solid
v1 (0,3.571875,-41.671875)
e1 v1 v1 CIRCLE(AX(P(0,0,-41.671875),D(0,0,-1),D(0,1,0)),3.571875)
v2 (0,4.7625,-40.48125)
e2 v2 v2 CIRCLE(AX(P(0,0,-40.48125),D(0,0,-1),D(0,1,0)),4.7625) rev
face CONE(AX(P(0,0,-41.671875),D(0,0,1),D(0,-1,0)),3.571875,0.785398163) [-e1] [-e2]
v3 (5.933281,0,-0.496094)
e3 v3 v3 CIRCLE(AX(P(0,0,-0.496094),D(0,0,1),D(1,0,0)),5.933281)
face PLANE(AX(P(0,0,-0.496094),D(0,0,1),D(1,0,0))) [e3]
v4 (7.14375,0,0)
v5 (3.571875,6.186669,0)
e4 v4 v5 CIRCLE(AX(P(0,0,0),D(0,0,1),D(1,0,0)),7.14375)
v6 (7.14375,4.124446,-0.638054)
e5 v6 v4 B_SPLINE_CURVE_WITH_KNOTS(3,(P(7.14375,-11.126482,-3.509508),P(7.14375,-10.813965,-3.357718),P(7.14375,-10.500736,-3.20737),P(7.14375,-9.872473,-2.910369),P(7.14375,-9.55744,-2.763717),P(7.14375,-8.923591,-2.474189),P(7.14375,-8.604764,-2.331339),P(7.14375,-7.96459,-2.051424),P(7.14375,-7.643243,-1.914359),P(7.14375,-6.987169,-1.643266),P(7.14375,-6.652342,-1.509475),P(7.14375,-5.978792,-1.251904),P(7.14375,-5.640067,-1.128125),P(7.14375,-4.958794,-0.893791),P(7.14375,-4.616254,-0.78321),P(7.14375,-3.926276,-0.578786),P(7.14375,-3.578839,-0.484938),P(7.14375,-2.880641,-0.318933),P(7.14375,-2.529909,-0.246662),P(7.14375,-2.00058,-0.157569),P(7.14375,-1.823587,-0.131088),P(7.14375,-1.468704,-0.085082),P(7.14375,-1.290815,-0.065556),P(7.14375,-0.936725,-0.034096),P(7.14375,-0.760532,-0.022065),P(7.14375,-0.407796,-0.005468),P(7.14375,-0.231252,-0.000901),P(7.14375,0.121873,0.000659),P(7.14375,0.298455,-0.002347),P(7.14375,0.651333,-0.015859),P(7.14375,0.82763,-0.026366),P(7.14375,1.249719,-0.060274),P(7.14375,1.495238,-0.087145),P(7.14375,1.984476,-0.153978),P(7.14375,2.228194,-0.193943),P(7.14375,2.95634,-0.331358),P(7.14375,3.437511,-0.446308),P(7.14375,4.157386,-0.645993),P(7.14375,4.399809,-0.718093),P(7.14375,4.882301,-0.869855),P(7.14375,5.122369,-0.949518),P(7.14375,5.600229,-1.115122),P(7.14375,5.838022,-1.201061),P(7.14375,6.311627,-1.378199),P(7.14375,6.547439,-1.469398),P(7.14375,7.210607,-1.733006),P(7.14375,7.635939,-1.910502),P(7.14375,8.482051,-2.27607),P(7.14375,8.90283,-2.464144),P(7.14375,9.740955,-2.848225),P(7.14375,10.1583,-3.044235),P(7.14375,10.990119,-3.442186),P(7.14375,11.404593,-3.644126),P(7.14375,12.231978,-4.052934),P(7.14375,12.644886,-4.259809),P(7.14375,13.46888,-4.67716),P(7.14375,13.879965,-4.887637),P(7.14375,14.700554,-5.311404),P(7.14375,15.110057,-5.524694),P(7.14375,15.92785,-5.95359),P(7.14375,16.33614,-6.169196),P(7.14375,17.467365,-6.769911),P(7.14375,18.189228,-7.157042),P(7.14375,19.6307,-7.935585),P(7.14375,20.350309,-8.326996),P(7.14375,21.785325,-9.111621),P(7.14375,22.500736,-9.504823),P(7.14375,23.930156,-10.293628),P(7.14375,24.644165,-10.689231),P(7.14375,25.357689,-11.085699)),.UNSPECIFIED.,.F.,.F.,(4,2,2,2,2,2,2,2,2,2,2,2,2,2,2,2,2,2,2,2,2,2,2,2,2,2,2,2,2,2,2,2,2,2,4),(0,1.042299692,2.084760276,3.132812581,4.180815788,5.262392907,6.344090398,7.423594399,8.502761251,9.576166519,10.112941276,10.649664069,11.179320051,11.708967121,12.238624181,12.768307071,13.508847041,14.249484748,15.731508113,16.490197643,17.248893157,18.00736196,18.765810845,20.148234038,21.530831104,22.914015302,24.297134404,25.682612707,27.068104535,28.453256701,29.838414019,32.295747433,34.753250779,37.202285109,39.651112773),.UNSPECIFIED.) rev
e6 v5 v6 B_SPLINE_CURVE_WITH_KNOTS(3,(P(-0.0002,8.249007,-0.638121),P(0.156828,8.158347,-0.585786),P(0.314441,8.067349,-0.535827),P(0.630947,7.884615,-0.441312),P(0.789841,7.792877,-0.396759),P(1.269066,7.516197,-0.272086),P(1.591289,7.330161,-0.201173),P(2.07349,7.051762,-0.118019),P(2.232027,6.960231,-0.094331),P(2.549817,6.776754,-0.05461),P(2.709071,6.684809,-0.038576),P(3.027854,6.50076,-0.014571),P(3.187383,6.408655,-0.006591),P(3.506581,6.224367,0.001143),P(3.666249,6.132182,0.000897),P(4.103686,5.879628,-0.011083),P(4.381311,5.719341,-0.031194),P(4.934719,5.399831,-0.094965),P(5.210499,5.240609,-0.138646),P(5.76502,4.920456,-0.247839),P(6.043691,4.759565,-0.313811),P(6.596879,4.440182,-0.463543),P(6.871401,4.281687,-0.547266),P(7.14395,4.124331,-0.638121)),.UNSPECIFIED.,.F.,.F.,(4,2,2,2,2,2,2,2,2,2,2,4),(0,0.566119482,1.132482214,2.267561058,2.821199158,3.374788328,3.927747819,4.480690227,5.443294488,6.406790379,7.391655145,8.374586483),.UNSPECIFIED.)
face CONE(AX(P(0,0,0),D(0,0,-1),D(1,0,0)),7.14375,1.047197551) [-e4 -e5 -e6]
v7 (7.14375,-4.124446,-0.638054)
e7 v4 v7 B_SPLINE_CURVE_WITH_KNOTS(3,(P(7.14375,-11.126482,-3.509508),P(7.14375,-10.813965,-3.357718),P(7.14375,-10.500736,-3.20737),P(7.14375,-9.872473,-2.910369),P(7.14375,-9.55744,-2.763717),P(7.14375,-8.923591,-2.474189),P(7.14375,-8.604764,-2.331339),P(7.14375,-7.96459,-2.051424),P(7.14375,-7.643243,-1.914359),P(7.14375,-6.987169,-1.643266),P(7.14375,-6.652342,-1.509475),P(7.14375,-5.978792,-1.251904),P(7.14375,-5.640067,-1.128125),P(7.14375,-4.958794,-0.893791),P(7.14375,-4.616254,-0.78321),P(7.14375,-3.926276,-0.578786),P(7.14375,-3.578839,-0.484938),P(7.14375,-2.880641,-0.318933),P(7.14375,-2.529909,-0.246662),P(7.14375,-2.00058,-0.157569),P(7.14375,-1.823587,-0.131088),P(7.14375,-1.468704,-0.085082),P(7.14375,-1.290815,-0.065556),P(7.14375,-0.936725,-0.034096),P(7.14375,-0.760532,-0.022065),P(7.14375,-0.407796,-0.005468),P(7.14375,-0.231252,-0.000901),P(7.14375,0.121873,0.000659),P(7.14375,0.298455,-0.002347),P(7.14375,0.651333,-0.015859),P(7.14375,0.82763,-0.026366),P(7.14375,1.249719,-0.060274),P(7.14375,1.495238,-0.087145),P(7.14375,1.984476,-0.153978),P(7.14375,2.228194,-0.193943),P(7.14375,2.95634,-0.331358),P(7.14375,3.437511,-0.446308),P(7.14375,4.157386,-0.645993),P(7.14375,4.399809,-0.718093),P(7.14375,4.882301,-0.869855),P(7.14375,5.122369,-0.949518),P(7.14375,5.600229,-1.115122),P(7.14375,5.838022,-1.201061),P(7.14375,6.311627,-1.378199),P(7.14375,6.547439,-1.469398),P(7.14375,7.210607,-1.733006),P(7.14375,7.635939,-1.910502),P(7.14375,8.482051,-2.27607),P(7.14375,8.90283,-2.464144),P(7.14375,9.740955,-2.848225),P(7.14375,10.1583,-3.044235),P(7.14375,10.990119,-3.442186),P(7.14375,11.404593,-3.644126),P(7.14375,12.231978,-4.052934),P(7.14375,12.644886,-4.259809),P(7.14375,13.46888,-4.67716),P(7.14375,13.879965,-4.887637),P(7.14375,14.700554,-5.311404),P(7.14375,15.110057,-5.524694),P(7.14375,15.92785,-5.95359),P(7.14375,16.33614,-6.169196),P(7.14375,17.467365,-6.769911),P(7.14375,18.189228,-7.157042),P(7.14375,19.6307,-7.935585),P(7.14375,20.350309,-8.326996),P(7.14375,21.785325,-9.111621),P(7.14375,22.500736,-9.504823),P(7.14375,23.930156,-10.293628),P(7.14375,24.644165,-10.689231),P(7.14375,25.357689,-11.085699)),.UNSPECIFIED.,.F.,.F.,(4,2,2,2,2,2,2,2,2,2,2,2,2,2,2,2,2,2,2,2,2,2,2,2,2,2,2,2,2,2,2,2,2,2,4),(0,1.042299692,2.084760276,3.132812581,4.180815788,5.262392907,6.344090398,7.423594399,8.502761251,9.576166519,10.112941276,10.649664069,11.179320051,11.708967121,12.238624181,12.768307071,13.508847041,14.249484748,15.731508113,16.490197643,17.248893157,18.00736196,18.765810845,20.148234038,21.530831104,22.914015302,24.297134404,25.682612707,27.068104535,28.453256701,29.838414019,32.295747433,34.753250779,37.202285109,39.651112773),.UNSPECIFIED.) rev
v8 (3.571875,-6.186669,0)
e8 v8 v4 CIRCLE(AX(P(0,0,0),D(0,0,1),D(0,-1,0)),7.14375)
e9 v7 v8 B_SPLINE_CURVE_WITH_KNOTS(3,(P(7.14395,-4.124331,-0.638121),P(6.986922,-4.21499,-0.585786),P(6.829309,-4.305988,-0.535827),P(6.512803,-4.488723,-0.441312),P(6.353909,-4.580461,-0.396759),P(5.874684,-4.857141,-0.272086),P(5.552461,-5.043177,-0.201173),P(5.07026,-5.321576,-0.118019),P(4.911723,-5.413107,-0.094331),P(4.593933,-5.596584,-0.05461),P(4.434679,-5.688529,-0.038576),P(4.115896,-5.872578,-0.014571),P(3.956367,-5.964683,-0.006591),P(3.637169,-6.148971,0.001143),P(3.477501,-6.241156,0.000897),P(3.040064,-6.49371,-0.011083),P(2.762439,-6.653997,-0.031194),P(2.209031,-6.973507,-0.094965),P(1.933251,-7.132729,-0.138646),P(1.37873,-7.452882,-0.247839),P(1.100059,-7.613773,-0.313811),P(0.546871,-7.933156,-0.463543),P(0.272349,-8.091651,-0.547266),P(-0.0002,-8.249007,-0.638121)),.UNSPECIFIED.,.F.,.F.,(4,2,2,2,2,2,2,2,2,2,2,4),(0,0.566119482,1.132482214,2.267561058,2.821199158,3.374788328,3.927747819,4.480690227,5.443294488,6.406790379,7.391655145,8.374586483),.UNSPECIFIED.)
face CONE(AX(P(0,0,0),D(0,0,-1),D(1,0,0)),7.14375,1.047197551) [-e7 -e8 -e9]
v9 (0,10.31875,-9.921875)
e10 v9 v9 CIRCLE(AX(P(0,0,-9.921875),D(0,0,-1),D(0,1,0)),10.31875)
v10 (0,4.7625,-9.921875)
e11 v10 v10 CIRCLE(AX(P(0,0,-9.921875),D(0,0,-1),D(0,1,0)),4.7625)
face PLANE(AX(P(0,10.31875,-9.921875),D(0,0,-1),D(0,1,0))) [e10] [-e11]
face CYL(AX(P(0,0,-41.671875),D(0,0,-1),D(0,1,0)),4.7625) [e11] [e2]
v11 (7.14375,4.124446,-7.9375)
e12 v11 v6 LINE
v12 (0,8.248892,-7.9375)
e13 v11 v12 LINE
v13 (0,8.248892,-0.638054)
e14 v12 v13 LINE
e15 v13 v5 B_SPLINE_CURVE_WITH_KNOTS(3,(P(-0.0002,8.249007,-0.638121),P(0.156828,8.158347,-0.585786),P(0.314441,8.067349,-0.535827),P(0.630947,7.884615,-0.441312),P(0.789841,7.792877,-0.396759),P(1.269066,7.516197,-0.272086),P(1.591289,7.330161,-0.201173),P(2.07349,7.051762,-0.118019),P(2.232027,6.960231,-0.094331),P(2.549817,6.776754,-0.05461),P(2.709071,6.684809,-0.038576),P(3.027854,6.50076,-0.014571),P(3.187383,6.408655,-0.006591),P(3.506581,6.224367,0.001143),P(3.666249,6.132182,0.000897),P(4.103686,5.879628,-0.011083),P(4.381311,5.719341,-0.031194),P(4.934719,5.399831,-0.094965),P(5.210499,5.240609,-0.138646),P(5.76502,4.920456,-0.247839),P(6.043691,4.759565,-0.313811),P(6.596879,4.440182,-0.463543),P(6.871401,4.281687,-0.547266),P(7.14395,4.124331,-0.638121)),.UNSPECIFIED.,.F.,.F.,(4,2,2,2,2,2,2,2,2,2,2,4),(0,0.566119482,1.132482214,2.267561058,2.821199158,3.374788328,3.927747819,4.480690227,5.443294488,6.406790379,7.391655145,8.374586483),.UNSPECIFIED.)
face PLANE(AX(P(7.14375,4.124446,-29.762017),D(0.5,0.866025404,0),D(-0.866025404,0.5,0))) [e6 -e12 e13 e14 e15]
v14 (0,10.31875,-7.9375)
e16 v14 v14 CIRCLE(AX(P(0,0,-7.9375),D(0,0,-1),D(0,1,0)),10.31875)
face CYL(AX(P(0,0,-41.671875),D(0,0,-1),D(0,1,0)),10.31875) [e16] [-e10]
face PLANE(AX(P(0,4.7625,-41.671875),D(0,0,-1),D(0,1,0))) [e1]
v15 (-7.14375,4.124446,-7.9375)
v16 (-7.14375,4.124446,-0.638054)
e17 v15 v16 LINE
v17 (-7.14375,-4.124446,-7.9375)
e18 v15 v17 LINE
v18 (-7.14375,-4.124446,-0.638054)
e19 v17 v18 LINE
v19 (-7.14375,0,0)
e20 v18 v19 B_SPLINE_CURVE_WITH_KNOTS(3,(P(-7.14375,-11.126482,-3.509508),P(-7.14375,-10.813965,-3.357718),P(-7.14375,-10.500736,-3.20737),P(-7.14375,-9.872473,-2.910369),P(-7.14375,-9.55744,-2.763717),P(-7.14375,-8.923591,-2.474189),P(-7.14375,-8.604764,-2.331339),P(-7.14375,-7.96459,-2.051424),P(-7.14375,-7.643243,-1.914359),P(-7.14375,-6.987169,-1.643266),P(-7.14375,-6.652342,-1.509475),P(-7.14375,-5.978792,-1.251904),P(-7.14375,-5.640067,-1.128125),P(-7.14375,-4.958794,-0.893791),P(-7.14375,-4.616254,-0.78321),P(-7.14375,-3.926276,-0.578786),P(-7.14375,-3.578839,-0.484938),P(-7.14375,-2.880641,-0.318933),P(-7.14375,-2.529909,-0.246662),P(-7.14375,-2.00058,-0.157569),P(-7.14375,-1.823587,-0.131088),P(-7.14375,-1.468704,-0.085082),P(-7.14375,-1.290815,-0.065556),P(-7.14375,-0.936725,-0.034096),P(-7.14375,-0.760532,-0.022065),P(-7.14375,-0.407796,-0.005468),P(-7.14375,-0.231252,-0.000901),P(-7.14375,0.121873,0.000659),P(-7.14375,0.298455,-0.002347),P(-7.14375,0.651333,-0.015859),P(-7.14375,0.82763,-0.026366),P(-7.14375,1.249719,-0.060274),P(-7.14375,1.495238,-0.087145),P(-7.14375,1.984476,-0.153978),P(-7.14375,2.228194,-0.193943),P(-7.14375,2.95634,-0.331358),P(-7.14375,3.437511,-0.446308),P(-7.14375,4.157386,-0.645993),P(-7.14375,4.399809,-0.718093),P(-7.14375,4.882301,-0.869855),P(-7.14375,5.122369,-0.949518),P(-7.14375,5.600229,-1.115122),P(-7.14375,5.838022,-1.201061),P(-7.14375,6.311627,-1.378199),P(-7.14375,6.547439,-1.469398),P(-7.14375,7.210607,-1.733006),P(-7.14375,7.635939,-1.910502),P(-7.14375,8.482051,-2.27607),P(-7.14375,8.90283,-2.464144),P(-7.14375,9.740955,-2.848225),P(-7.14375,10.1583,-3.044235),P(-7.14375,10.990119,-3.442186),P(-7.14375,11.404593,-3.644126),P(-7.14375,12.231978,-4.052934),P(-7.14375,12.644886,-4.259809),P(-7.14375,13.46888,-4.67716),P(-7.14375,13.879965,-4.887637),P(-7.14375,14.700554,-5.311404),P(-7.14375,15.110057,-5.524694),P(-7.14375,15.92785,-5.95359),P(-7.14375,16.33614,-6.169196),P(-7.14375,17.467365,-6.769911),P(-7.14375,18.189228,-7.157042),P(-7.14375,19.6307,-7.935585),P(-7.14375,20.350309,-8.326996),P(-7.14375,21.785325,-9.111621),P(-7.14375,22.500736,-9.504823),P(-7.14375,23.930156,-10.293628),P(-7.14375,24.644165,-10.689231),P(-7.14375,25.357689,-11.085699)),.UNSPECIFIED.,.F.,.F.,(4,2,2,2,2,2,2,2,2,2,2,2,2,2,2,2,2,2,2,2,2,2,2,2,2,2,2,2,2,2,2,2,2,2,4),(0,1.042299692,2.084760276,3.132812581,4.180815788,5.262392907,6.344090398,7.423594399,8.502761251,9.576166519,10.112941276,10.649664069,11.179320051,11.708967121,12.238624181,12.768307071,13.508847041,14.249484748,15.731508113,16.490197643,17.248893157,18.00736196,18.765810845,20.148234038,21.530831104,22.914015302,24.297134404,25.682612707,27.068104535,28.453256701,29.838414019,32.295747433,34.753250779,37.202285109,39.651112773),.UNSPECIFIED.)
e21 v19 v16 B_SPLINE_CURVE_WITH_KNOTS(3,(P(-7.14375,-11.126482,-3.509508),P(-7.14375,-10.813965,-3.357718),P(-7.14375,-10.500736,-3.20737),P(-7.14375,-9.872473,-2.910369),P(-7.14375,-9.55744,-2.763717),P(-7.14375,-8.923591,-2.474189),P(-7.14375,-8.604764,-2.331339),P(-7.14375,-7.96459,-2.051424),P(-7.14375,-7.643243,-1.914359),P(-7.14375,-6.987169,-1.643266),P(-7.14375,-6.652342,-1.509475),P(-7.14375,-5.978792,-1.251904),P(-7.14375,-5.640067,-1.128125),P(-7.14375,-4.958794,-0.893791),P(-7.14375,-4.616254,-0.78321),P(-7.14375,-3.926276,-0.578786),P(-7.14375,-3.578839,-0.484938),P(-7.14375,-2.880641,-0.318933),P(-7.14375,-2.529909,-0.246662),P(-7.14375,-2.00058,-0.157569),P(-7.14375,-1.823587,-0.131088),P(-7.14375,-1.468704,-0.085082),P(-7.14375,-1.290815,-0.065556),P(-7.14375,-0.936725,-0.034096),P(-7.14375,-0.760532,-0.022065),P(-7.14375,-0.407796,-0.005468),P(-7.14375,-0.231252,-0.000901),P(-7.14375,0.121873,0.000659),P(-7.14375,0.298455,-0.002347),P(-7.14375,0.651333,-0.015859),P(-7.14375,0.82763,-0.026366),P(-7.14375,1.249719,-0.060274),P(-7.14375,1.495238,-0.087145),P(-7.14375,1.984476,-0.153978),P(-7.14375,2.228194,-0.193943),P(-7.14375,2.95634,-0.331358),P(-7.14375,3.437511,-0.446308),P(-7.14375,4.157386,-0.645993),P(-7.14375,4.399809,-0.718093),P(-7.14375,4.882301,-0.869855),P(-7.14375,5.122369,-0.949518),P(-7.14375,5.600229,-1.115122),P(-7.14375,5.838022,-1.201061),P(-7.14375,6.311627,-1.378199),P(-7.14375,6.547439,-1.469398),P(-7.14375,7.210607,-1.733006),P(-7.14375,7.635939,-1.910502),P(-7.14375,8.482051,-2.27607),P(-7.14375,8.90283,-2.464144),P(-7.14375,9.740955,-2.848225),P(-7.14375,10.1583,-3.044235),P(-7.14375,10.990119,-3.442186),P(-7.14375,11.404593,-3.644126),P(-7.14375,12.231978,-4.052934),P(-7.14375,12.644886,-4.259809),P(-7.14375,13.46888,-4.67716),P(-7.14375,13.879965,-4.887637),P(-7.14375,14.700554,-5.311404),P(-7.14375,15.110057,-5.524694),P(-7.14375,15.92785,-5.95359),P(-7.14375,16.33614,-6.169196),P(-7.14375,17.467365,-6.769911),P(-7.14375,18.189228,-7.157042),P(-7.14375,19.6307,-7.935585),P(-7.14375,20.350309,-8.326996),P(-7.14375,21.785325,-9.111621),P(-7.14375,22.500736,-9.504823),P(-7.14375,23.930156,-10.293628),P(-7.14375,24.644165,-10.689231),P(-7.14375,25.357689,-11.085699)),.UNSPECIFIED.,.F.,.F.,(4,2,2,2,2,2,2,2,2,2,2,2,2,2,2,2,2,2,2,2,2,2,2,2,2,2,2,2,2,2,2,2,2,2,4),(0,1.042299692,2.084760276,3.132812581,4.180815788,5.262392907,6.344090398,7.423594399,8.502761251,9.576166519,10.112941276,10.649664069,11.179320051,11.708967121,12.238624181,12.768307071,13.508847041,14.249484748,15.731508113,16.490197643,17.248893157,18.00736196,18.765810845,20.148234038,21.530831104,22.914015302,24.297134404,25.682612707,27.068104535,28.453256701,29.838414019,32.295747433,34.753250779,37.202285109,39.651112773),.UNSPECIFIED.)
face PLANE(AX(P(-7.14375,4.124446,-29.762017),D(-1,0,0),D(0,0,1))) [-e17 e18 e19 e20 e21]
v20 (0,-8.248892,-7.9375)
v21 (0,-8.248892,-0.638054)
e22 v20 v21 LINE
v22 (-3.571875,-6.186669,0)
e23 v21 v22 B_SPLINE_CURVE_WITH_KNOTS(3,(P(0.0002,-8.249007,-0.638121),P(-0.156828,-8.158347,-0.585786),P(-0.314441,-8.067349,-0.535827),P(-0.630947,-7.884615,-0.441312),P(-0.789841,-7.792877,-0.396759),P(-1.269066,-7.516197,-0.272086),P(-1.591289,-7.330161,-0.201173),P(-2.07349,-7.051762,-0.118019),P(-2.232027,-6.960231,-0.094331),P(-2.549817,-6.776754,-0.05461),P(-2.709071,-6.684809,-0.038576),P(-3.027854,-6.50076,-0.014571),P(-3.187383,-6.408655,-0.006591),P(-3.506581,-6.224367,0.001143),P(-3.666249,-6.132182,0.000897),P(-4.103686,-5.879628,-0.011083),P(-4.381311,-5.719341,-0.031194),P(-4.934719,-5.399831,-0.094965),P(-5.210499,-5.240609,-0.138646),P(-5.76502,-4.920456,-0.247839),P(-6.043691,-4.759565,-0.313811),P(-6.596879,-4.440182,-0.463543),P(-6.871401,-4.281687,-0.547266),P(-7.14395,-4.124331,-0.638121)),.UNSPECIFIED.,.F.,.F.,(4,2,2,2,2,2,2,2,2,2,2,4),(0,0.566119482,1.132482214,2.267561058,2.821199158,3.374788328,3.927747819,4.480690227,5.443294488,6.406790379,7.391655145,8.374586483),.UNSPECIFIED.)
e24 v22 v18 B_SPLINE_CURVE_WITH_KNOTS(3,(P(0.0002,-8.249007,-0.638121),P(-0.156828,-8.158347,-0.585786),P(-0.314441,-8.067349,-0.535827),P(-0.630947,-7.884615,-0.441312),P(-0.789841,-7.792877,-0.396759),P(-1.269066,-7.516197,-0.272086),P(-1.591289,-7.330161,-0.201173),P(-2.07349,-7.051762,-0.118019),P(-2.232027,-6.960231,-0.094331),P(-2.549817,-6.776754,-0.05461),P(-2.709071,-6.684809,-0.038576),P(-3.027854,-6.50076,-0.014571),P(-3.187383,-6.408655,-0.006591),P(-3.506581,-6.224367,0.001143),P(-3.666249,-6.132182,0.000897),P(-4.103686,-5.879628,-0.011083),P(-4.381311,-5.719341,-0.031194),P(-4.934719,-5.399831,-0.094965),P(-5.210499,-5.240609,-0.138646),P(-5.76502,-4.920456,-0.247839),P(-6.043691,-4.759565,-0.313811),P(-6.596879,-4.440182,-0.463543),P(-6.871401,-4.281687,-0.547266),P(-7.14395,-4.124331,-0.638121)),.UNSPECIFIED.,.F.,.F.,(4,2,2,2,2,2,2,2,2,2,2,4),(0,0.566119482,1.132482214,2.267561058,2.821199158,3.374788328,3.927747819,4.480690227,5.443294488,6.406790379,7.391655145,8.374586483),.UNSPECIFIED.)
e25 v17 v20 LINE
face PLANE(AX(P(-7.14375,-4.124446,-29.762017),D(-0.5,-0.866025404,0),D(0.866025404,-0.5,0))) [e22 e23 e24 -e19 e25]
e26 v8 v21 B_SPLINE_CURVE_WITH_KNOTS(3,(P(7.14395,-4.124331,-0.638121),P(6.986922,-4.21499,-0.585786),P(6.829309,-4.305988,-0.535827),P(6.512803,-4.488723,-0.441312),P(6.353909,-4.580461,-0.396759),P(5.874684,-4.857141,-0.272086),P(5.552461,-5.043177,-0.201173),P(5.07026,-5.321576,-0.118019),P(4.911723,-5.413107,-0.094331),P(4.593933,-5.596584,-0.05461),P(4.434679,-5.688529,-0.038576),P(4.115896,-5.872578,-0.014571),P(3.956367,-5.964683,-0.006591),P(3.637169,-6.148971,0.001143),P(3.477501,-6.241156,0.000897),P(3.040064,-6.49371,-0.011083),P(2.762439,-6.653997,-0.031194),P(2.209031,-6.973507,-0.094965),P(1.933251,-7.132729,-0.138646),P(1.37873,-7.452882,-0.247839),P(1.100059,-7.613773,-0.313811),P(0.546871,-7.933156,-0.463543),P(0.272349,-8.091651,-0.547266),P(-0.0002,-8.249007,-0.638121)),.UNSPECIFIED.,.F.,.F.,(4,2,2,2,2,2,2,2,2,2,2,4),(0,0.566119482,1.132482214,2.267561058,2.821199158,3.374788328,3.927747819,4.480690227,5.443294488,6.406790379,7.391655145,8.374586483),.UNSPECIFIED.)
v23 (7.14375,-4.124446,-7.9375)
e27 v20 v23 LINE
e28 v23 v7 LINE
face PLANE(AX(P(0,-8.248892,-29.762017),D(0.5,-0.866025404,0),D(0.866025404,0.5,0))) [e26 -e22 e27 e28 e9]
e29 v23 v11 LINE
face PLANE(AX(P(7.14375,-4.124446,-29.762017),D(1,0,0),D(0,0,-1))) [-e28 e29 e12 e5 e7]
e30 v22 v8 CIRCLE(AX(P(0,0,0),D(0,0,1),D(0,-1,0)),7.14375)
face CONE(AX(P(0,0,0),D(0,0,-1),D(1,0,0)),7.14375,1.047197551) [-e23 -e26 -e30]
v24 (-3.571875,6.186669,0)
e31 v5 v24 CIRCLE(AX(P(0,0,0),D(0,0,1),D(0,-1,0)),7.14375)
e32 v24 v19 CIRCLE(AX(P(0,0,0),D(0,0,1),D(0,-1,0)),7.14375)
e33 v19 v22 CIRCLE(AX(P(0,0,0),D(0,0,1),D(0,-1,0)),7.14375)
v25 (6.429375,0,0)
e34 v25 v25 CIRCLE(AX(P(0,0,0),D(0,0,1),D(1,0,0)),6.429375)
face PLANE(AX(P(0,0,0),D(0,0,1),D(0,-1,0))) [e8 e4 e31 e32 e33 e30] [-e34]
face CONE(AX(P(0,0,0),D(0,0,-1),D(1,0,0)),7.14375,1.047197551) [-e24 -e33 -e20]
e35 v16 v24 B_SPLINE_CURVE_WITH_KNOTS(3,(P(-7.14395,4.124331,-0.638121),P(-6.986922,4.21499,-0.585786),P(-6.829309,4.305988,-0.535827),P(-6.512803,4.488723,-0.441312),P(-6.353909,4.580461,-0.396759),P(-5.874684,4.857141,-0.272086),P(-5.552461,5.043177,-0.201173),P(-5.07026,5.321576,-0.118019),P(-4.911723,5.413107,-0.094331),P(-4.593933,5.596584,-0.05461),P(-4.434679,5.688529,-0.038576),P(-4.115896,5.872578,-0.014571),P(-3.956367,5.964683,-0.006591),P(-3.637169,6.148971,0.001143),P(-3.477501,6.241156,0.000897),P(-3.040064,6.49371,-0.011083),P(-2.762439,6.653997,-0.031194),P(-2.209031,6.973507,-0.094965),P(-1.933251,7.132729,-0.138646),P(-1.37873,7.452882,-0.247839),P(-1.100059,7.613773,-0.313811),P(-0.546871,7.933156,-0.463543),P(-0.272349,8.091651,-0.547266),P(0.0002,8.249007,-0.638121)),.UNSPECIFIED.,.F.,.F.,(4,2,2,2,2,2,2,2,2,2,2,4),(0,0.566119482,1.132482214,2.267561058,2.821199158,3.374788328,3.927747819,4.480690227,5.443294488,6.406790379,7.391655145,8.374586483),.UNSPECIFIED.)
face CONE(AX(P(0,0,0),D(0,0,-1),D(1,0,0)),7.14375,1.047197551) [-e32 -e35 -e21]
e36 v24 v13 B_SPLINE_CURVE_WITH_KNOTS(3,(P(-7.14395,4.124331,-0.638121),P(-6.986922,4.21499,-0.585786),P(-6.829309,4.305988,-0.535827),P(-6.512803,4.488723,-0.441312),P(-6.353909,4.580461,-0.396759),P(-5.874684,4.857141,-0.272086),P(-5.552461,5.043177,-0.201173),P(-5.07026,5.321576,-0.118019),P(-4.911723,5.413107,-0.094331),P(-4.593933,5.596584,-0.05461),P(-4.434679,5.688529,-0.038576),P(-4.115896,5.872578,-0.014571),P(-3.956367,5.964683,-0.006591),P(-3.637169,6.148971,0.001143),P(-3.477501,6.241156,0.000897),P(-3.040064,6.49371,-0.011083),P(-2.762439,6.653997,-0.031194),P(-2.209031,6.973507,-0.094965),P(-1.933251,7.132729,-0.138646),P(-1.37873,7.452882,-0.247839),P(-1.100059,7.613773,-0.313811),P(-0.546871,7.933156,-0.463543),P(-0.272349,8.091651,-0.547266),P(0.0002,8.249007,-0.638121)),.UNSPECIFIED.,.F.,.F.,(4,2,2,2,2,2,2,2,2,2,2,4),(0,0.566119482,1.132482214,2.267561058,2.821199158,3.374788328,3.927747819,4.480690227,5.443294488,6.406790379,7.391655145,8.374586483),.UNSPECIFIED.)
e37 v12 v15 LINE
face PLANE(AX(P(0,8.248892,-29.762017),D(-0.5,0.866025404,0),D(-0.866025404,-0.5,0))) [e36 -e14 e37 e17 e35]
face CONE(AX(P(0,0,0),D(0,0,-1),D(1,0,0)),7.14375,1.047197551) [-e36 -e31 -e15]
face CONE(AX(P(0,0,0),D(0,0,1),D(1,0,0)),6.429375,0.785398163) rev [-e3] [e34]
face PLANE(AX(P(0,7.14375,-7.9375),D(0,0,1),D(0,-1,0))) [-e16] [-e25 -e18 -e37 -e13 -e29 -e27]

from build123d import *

# Parameters (mm, degrees)
BOSS_EXTRUDE1_DEPTH = 7.9375
SKETCH3_R           = 6.429375
CUT_EXTRUDE1_DEPTH  = 0.49609375
CUT_EXTRUDE1_DRAFT  = -45
CHAMFER1_SIZE       = 1.190625


# Read off the part's stored shape, not the designer's step: Cut-Extrude2
with BuildPart() as part:
    # Sketch1 → Revolve1 (revolve)
    with BuildSketch(Plane(origin=(0, 0, 0), x_dir=(0, 0, -1), z_dir=(1, 0, 0))):
        Polygon((9.921875, 4.7625), (41.671875, 4.7625), (41.671875, 0), (0, 0), (0, 7.14375), (7.9375, 7.14375), (7.9375, 10.31875), (9.921875, 10.31875), align=None)
    revolve(axis=Axis((0, 0, -41.671875), (0, 0, 1)))

    # Sketch2 → Boss-Extrude1 (add)
    with BuildSketch(Plane.XY):
        Polygon((7.14375, 4.124445986), (0, 8.248891971), (-7.14375, 4.124445986), (-7.14375, -4.124445986), (0, -8.248891971), (7.14375, -4.124445986), align=None)
    extrude(amount=-BOSS_EXTRUDE1_DEPTH)

    # Cut-Extrude2 outline → Cut-Extrude2 (revolve, cut)
    with BuildSketch(Plane.XZ):
        Polygon((8.248891975, 1.48e-06), (7.143748081, 1.48e-06), (8.248891975, -0.638054017), align=None)
    revolve(axis=Axis((0, 0, 0), (0, 0, 1)), mode=Mode.SUBTRACT)


with BuildPart() as cut_extrude1_tool:
    # Sketch3 → Cut-Extrude1 (with draft: the straight prism first)
    with BuildSketch(Plane.XY):
        Circle(SKETCH3_R)
    extrude(amount=-CUT_EXTRUDE1_DEPTH)
    # Cut-Extrude1: the draft: its side faces are tilted about the plane it starts from
    cut_extrude1_sides = [cut_extrude1_tool.faces().sort_by_distance(p)[0] for p in [
        (-6.429375, 0, -0.248046875),
    ]]
    draft(cut_extrude1_sides, Plane.XY, CUT_EXTRUDE1_DRAFT)


with BuildPart() as part_1:
    add(part.part)

    # Cut-Extrude1: cut by cut_extrude1_tool
    add(cut_extrude1_tool.part, mode=Mode.SUBTRACT)

    # Chamfer1
    chamfer1_edges = [part_1.edges().sort_by_distance(p)[0] for p in [
        (0, -4.7625, -41.671875),
    ]]
    chamfer(chamfer1_edges, length=CHAMFER1_SIZE)


solid = part_1.part
